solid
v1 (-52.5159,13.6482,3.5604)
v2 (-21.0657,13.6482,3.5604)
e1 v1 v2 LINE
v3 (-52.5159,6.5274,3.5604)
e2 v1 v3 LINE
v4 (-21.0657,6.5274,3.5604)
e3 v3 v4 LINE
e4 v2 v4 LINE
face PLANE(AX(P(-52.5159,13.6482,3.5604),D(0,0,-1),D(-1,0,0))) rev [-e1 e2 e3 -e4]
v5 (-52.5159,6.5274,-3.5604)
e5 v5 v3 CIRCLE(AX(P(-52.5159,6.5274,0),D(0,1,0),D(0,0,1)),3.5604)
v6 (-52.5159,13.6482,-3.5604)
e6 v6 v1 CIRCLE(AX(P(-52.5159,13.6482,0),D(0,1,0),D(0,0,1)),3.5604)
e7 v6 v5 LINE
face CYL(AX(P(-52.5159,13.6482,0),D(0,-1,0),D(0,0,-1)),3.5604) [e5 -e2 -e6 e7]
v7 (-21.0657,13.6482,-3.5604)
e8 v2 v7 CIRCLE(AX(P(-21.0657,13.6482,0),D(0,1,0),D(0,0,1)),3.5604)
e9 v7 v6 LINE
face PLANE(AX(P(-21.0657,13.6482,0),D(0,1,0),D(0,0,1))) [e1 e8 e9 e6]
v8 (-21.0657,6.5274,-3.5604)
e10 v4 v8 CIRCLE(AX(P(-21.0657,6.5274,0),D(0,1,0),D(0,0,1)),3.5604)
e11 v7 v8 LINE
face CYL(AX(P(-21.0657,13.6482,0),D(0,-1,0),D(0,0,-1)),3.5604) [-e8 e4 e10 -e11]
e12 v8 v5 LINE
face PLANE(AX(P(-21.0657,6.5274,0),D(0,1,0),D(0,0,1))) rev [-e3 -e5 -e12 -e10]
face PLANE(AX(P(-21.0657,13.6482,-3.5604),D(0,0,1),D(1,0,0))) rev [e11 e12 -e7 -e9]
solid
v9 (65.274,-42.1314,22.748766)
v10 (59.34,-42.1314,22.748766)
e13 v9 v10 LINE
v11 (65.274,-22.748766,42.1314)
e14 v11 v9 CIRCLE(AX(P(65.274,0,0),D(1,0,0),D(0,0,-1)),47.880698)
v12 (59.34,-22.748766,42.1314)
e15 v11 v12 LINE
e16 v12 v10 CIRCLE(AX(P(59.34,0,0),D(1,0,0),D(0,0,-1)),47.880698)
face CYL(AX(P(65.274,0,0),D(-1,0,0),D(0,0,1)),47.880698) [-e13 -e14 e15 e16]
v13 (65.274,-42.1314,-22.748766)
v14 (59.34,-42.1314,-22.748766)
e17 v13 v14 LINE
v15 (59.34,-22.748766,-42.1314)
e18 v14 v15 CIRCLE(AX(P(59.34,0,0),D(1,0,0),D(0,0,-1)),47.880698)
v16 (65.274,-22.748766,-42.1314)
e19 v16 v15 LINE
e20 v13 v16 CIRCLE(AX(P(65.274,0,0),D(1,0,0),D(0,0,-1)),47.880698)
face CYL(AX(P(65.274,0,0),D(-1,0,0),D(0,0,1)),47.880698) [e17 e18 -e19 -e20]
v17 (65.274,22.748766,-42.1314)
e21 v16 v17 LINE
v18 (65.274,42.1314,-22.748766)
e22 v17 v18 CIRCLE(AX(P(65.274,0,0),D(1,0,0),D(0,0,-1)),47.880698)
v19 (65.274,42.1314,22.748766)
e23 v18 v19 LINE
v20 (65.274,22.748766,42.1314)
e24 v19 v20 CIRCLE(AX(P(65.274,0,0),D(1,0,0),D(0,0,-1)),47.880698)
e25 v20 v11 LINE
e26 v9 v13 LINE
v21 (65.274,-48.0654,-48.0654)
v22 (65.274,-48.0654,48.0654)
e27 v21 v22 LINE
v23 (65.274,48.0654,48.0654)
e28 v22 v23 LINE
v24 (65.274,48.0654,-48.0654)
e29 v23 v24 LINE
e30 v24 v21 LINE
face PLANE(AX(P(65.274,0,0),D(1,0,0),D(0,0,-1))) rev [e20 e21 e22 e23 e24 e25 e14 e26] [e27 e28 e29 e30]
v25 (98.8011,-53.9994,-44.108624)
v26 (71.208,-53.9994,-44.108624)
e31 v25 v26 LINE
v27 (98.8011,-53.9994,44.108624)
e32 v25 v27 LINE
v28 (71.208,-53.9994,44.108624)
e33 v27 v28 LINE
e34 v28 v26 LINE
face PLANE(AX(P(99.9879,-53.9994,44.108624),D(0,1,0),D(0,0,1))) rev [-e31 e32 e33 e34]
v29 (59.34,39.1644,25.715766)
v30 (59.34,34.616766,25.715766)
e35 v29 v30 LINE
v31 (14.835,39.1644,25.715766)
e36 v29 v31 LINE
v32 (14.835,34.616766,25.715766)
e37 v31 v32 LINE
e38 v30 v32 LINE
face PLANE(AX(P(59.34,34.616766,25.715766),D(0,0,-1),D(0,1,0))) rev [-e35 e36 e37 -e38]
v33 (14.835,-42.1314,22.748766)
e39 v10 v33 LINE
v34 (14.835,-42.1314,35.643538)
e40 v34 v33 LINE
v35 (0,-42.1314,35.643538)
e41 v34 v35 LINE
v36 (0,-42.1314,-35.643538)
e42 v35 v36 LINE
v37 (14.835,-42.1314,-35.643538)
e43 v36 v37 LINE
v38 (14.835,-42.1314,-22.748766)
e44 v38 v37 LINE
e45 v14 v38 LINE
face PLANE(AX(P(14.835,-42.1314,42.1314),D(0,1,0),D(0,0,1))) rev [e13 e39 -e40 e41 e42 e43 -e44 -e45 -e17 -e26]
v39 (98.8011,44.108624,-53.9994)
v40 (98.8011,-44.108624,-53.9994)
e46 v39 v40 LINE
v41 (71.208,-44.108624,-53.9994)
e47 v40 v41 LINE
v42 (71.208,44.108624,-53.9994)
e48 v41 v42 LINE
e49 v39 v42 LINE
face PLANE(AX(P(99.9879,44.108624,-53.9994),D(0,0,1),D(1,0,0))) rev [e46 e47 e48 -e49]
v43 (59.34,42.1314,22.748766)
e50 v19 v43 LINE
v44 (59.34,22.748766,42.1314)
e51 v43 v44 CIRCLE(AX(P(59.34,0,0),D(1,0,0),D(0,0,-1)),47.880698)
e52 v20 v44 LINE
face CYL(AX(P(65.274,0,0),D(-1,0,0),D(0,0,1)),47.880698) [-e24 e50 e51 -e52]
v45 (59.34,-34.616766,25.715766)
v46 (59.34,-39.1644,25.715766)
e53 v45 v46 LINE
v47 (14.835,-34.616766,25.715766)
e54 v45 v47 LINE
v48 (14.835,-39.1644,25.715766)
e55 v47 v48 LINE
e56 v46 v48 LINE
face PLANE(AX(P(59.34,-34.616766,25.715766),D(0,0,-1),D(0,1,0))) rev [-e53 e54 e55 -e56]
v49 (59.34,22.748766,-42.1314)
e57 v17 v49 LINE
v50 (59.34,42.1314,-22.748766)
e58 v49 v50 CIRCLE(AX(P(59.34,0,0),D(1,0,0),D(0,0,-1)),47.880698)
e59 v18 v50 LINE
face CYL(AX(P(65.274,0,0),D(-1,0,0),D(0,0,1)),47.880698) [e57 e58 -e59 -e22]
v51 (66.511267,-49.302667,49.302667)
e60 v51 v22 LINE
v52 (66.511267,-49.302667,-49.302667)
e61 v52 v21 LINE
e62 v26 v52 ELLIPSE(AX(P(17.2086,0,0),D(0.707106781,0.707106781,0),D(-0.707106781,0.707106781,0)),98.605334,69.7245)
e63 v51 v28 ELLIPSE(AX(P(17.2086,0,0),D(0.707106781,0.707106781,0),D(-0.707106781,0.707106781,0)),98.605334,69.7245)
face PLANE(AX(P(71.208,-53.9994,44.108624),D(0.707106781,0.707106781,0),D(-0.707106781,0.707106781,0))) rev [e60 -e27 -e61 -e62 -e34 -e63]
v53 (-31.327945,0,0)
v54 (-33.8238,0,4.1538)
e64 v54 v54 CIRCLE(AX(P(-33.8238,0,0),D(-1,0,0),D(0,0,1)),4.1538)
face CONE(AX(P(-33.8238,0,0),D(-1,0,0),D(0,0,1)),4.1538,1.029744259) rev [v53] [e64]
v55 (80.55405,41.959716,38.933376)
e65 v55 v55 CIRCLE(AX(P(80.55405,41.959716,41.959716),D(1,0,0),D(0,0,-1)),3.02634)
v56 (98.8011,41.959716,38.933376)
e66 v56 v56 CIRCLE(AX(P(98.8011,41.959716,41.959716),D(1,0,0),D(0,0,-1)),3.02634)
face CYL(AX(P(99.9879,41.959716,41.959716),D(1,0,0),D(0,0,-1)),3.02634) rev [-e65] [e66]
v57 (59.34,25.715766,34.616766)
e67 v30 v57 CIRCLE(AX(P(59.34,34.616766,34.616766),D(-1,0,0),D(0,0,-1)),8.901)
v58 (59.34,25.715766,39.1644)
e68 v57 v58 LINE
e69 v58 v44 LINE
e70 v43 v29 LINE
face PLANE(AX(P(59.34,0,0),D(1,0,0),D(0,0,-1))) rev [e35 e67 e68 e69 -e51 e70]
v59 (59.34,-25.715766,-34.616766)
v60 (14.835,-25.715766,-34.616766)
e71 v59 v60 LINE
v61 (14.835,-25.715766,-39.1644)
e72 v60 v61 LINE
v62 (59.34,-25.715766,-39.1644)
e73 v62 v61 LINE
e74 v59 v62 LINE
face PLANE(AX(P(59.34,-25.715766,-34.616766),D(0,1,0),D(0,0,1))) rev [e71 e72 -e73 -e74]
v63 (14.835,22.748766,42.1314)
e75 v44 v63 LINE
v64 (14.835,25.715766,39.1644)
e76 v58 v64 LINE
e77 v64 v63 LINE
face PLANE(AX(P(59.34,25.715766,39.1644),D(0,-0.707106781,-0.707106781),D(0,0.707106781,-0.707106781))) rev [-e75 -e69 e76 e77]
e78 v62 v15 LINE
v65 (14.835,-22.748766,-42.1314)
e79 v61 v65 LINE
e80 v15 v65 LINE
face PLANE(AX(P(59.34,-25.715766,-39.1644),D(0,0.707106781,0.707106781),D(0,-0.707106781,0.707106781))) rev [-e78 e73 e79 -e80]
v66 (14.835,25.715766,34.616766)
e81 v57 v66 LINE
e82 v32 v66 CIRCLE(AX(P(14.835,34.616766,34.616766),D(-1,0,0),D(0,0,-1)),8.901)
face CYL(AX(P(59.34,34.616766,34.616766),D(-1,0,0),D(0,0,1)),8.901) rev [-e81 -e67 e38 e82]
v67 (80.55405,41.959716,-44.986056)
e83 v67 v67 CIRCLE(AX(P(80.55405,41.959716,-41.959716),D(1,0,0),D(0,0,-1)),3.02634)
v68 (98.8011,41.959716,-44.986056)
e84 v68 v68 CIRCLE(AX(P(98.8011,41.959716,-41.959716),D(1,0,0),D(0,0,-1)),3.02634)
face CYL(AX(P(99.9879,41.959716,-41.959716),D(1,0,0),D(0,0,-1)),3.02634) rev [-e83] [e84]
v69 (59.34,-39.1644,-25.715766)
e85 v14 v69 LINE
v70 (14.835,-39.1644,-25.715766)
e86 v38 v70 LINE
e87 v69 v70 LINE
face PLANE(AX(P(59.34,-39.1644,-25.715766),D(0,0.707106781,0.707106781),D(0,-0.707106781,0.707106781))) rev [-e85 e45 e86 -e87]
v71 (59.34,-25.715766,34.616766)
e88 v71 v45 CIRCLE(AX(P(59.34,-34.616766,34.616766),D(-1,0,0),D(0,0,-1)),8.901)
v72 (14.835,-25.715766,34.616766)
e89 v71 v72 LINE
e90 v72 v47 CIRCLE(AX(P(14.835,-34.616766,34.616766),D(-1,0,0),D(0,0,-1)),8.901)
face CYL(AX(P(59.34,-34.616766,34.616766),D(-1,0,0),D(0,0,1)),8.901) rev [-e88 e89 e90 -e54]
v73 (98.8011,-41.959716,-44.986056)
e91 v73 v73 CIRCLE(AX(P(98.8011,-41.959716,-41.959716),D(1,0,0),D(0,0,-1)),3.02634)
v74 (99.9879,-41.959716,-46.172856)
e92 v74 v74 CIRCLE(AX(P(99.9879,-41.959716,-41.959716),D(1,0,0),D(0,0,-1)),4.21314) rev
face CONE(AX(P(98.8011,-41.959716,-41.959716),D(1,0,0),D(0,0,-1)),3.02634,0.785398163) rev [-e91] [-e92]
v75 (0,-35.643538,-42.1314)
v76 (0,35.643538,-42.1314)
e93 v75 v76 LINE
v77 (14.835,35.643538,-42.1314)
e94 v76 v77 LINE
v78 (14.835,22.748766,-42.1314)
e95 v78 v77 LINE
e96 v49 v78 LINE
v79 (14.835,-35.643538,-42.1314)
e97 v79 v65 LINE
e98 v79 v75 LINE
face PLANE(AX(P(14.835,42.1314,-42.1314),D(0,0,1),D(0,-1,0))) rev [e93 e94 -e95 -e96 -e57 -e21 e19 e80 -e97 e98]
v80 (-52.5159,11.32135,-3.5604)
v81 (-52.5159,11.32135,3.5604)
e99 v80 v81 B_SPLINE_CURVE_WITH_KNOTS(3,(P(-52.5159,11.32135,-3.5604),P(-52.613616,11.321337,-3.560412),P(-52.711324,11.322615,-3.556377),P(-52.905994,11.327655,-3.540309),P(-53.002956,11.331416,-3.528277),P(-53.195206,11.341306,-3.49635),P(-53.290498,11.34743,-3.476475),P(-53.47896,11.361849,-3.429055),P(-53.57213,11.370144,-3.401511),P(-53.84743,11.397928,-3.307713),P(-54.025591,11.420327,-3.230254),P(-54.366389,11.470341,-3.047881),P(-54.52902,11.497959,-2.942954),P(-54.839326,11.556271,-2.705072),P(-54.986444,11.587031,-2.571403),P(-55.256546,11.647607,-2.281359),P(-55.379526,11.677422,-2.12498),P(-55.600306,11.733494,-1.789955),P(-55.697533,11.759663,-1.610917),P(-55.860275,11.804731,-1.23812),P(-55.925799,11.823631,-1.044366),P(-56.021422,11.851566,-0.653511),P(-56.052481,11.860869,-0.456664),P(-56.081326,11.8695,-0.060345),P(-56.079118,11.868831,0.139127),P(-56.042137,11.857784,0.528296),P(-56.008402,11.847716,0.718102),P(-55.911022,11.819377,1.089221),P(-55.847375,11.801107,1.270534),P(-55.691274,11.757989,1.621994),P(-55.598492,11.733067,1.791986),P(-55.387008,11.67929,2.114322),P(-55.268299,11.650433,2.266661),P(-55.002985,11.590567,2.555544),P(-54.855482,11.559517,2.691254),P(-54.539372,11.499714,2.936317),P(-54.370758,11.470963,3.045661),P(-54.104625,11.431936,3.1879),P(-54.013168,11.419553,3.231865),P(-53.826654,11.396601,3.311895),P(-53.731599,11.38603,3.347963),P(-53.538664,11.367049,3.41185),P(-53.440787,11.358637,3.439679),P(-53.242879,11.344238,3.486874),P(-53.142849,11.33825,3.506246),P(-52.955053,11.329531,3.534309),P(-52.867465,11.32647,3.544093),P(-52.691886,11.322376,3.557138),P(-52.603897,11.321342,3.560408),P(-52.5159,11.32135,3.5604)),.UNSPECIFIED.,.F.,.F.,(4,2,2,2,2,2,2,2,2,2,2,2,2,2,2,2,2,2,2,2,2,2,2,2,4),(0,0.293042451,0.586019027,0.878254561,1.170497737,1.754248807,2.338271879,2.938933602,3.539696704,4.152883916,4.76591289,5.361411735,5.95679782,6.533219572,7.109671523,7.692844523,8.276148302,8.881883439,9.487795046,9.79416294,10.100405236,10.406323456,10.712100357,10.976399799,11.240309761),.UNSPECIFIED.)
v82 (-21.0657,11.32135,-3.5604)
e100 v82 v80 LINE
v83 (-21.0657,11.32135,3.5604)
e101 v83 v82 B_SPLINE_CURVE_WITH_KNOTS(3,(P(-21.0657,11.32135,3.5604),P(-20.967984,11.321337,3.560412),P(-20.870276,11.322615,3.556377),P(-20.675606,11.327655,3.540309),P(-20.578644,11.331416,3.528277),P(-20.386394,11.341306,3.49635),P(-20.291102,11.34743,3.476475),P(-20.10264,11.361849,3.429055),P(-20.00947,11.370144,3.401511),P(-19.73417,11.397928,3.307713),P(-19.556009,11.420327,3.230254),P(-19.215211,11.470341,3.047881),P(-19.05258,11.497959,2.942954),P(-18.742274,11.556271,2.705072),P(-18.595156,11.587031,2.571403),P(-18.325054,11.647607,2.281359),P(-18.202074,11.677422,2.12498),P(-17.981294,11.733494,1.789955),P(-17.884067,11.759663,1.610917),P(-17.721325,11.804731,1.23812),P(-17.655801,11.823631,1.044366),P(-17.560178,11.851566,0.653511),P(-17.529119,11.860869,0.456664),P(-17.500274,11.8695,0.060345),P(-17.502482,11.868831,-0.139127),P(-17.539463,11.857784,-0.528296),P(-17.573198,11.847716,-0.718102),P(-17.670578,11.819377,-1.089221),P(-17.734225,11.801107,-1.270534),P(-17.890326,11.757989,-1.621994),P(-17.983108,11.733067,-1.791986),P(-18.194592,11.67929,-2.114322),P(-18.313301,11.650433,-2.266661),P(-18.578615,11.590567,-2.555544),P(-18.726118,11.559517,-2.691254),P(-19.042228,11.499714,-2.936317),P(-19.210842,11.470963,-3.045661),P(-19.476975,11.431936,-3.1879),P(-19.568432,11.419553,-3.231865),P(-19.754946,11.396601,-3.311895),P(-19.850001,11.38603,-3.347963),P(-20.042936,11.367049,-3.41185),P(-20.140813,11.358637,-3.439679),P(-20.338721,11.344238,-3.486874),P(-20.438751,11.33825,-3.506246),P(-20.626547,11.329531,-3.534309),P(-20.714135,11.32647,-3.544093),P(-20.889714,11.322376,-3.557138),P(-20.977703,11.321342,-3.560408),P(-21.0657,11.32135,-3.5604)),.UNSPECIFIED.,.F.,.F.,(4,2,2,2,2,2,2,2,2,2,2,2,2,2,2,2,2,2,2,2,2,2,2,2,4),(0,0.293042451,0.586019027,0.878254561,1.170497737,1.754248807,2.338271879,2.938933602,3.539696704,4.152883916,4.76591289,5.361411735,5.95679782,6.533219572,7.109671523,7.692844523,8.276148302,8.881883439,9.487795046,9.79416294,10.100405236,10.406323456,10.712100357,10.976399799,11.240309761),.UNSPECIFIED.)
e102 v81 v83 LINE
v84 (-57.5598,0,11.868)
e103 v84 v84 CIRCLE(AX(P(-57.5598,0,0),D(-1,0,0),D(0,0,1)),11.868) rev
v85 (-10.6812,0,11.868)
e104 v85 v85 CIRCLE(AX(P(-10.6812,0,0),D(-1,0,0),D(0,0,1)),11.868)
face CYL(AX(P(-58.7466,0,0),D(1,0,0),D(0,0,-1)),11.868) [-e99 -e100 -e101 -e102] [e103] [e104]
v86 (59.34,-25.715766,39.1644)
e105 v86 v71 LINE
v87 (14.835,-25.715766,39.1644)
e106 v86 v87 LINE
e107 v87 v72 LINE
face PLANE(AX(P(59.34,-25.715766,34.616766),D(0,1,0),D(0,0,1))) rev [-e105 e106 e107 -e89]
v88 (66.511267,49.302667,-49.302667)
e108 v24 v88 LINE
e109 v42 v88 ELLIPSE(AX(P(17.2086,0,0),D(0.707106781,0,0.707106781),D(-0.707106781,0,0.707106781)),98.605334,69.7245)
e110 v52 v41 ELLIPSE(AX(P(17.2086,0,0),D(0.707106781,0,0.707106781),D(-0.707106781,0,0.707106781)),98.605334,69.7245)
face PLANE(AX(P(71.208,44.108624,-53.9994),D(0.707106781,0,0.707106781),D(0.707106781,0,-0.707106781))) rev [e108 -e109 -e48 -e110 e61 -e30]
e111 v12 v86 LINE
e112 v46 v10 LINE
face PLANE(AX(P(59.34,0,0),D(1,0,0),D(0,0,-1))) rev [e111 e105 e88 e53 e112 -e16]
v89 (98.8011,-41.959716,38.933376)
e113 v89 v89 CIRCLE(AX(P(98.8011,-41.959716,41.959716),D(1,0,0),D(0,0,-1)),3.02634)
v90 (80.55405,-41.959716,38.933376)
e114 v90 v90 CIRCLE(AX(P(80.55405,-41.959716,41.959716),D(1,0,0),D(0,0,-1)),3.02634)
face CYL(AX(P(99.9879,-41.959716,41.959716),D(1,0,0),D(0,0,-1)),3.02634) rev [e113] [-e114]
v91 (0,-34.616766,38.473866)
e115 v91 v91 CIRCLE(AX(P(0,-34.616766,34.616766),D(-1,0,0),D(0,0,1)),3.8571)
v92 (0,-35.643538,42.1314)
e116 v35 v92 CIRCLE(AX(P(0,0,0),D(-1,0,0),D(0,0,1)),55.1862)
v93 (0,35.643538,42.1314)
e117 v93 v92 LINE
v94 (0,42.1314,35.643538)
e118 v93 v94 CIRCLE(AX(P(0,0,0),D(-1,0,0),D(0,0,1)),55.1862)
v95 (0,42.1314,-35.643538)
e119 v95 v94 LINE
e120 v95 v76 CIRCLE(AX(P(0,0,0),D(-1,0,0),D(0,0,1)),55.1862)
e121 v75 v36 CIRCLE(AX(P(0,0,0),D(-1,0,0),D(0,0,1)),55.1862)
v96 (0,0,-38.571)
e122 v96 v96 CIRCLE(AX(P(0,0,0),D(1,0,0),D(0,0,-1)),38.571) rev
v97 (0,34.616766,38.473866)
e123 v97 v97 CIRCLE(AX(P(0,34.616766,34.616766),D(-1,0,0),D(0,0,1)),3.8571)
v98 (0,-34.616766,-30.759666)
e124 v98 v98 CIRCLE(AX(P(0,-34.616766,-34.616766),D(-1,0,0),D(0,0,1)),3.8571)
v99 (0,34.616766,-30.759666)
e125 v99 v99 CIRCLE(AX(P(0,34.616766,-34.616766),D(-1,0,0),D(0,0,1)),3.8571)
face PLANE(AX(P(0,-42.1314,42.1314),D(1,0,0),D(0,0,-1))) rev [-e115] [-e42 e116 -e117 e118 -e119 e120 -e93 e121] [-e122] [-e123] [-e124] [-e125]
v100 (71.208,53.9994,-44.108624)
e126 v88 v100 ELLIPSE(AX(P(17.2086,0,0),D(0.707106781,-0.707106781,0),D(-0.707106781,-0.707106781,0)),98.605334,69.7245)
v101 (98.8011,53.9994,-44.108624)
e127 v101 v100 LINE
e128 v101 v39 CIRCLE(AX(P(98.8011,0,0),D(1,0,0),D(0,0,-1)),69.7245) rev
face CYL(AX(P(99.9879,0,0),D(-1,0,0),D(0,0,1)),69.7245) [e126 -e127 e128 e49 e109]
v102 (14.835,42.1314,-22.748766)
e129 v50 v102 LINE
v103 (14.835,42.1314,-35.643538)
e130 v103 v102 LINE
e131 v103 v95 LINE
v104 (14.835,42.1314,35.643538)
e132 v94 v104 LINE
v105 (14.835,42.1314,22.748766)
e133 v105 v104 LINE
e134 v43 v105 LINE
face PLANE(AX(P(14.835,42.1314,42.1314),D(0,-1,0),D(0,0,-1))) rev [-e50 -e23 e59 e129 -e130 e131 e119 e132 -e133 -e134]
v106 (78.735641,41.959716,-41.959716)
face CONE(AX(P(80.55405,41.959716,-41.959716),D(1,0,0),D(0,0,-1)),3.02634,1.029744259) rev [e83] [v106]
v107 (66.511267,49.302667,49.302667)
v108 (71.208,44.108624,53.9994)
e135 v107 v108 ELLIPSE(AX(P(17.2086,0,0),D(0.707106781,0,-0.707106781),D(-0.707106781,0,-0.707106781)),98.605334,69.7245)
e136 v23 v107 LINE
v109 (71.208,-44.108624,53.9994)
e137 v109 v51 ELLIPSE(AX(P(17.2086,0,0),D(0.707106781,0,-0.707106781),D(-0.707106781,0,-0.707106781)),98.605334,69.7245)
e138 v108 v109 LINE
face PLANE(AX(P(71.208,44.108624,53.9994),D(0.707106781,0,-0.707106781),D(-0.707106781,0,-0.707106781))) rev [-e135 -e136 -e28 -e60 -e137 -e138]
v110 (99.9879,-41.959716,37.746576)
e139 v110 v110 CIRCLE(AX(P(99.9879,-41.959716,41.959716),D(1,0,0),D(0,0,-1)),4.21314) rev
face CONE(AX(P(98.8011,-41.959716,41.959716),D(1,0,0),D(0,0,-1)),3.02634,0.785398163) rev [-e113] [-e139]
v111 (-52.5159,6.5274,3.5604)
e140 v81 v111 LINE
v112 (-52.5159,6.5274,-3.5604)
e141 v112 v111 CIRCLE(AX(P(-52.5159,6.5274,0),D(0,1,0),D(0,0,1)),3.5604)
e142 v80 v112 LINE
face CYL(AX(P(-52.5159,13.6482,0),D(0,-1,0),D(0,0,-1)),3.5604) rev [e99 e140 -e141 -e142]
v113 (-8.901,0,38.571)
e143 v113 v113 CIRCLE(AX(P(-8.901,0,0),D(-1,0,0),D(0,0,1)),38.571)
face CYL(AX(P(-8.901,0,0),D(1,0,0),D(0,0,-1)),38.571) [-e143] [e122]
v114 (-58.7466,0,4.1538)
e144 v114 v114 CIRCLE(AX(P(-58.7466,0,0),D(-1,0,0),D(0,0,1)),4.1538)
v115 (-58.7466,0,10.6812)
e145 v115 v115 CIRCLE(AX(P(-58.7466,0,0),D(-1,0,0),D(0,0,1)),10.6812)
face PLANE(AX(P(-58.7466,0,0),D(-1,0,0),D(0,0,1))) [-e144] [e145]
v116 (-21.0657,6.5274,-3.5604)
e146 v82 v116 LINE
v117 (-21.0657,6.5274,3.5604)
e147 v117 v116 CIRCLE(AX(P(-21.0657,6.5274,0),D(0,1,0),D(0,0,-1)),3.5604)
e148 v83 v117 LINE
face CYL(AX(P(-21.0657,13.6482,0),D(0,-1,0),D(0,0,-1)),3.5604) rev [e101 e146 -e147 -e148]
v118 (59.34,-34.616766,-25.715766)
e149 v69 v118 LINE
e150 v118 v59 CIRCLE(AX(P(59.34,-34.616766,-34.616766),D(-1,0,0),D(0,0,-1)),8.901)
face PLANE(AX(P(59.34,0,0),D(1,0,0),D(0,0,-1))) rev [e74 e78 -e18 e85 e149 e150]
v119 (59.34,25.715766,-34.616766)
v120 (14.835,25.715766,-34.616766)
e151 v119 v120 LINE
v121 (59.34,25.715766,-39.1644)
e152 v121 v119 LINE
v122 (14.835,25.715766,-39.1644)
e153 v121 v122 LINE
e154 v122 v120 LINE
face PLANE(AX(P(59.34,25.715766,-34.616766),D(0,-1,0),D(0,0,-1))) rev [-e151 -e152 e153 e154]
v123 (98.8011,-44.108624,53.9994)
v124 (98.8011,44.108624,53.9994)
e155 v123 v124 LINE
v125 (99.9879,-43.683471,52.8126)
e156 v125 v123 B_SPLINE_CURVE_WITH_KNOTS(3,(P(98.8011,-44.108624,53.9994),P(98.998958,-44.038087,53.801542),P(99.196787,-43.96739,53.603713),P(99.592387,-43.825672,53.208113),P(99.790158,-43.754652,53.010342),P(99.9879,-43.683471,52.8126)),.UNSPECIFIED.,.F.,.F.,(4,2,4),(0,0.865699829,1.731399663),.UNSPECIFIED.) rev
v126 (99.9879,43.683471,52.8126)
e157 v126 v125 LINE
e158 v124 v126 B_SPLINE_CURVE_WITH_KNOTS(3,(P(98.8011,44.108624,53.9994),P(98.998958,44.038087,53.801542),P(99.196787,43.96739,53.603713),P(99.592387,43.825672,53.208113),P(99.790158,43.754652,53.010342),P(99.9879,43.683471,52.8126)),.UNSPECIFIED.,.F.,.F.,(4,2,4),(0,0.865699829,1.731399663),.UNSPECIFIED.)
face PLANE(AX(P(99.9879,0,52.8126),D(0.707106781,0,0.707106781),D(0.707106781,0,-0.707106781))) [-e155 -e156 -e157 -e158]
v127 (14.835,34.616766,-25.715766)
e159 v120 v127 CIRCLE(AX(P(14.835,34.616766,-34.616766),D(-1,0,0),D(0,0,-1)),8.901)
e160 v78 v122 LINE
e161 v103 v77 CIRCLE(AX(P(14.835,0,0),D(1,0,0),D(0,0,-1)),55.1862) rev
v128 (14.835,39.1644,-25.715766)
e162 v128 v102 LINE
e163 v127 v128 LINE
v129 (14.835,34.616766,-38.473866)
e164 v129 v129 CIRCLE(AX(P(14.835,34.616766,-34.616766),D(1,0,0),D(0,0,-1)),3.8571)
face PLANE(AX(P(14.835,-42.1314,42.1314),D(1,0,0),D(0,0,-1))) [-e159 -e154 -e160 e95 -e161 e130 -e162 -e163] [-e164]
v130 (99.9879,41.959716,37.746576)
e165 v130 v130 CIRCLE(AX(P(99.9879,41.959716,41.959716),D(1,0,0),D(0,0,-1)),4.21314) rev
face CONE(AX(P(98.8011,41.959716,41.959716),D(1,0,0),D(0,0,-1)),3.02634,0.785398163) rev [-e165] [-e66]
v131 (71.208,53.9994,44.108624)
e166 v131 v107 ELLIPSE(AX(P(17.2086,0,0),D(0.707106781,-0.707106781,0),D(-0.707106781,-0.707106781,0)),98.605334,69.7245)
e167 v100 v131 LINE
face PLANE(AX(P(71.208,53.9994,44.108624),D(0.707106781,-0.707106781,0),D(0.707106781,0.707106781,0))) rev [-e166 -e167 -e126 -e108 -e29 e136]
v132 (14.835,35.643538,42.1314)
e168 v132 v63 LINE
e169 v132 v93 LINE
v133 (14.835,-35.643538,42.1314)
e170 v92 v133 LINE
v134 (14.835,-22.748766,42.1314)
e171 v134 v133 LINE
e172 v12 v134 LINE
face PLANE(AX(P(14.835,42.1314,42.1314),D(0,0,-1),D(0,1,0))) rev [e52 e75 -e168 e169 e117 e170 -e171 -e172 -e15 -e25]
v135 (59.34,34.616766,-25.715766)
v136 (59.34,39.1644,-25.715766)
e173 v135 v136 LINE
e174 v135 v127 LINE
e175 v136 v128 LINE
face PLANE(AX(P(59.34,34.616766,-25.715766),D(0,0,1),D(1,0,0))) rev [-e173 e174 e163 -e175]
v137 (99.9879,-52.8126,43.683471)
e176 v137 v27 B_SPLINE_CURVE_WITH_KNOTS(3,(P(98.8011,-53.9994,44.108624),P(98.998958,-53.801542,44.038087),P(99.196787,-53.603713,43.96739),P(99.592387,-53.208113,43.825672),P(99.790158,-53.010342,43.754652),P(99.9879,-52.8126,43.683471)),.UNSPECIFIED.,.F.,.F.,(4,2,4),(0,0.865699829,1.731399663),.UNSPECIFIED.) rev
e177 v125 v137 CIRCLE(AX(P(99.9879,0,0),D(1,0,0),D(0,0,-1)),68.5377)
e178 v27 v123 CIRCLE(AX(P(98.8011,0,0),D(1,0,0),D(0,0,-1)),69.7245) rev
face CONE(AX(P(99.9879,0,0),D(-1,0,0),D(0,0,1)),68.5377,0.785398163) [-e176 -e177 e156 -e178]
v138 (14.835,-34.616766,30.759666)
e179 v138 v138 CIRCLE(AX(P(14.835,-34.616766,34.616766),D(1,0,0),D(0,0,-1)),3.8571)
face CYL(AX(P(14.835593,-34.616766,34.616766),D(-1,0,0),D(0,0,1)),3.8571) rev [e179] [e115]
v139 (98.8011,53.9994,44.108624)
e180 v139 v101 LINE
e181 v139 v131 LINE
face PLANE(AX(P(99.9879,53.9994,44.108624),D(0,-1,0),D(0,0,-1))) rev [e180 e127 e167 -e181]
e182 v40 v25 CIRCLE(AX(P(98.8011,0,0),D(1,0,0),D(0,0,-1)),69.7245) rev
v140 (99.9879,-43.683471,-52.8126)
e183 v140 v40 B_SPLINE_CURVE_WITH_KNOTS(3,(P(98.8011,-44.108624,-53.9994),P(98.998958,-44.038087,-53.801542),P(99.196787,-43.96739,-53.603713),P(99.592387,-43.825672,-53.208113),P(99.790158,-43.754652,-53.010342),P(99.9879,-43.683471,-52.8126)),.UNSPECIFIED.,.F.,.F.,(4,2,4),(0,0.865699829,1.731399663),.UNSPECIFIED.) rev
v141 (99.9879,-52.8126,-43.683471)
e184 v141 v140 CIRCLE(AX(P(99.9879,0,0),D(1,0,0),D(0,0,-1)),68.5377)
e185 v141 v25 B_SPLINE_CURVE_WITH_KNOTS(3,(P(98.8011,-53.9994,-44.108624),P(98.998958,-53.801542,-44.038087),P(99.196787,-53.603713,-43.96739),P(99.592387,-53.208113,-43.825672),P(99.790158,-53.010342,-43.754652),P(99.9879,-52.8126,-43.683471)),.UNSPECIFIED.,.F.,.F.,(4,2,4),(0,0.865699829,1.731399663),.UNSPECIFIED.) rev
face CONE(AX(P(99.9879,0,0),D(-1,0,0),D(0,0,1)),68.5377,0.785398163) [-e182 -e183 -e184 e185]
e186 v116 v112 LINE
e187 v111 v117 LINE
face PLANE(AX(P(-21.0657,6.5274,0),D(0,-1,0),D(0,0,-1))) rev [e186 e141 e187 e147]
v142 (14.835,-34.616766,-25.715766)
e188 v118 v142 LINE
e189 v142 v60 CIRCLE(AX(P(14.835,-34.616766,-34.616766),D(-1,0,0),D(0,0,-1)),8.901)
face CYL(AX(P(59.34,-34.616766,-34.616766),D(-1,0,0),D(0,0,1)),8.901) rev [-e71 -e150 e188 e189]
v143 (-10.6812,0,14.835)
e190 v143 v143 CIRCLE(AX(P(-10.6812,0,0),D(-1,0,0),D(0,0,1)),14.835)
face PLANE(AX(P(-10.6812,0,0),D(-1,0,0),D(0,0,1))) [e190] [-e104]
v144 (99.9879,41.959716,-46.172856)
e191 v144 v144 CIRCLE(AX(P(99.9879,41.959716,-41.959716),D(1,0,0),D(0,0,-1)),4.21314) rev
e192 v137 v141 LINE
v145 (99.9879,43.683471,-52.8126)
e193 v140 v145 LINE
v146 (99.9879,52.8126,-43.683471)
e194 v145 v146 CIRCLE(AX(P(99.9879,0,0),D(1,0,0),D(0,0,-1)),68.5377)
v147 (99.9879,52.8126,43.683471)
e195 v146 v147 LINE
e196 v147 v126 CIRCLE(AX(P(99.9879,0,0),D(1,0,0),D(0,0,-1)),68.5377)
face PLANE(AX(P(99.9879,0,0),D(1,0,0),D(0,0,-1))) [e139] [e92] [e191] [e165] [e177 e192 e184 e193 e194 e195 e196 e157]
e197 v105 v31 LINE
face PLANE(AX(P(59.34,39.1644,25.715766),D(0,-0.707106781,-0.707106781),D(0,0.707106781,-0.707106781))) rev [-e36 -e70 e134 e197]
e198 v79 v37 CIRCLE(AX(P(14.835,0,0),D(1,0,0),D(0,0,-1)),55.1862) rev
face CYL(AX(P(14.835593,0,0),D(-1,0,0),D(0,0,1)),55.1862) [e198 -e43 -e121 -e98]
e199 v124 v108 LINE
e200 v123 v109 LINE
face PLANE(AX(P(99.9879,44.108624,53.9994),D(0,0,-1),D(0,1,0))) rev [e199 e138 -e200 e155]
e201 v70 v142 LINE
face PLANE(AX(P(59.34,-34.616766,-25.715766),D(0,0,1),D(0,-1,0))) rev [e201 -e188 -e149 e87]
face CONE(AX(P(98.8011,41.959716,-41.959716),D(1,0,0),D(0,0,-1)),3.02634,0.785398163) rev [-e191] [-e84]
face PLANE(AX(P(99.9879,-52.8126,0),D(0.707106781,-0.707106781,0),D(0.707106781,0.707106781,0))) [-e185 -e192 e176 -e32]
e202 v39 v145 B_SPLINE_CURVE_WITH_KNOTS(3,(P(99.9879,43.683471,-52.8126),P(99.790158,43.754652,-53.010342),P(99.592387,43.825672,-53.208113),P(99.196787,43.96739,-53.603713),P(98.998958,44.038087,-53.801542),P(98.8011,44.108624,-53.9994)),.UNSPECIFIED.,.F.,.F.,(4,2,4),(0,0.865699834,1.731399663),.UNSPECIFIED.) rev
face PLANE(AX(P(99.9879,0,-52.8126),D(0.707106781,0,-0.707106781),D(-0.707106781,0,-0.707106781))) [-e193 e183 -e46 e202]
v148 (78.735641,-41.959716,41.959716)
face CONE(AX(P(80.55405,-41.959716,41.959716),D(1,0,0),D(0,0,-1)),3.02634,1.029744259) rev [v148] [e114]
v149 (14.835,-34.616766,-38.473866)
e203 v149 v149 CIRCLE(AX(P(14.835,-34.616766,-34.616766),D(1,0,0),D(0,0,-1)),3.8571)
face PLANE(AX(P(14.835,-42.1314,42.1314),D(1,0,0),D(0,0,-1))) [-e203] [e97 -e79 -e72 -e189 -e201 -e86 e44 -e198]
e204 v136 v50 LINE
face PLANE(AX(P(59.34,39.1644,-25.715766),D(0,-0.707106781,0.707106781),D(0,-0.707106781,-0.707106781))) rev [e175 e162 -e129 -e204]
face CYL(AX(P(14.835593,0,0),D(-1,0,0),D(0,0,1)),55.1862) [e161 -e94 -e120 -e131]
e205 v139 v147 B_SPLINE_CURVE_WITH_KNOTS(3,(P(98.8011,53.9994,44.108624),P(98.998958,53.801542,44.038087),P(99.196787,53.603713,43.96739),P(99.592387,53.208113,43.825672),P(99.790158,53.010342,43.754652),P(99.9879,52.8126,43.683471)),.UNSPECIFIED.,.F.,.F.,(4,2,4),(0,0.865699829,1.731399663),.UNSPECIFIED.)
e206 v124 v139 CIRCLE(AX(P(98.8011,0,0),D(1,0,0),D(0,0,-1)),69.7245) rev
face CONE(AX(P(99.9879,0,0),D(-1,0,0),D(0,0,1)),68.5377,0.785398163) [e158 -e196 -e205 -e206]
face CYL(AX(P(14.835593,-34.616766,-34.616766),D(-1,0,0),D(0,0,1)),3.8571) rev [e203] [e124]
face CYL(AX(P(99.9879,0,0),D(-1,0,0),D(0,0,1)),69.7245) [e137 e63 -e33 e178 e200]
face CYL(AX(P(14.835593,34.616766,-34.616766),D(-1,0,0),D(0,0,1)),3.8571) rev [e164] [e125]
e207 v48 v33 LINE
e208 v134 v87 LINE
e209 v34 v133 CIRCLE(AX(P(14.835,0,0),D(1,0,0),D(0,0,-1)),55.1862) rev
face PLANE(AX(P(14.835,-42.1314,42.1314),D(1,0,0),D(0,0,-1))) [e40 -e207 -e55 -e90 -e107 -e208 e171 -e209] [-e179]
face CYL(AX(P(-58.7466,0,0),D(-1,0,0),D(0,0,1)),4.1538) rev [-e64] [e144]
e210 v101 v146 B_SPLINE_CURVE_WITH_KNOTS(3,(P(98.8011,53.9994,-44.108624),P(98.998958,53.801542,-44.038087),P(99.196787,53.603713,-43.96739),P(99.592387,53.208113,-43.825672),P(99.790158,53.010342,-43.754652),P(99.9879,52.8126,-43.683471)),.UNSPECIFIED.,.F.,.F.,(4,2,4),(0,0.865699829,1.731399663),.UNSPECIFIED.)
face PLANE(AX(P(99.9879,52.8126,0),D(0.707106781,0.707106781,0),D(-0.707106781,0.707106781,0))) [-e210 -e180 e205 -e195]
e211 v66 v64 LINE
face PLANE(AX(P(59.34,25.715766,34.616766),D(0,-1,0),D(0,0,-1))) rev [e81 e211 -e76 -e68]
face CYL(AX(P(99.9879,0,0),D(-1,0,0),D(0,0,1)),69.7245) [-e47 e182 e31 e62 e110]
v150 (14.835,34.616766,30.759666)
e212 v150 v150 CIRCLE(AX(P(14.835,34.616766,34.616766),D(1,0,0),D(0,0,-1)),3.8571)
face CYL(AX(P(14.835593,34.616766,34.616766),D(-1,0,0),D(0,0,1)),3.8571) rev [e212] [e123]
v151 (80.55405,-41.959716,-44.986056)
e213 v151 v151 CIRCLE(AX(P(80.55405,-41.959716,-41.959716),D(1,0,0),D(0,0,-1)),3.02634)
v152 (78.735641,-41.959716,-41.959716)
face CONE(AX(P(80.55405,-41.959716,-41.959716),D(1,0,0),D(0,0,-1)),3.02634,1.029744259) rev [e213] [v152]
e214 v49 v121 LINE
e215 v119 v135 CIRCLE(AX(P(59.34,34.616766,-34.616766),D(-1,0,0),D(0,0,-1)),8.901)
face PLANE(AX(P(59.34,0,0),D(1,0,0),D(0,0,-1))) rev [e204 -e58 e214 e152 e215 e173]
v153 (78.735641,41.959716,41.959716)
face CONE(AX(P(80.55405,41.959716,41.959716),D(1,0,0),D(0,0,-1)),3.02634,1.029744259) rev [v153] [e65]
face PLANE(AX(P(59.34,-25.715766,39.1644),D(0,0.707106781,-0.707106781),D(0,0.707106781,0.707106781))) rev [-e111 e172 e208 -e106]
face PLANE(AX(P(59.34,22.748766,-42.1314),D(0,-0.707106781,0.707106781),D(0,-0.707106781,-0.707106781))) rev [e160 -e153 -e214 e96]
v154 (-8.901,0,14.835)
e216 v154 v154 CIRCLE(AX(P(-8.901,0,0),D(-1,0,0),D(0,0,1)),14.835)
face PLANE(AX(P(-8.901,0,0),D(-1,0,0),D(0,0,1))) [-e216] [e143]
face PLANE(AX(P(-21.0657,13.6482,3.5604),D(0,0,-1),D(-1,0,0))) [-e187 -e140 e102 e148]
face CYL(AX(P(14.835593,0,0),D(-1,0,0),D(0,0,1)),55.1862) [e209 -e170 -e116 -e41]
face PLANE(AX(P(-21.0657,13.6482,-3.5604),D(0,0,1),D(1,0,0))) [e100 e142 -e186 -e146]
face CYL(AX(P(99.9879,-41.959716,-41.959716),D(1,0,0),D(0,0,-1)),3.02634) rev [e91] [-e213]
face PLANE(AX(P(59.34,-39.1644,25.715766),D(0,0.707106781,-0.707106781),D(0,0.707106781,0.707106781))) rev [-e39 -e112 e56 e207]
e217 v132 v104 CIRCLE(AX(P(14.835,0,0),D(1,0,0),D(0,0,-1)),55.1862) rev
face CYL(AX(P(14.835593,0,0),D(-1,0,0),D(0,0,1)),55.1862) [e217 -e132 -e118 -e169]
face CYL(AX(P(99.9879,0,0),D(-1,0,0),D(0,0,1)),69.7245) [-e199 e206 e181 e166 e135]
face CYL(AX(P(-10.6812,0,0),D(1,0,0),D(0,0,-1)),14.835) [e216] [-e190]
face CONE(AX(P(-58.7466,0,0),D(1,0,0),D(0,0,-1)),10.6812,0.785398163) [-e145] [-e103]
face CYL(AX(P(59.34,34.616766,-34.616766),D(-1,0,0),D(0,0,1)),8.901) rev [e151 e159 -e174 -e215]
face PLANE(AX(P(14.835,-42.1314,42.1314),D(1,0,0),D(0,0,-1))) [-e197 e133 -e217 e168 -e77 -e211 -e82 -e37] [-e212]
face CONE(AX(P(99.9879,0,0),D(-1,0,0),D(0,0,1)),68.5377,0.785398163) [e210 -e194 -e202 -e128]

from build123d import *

# Parameters (mm, degrees)
SKETCH_1_W                   = 142
SKETCH_1_H                   = 142
EXTRUDE_1_DEPTH              = 25
CUT_EXTRUDE_START            = -25
CUT_EXTRUDE_1_OUTLINE_R      = 6.5
CUT_EXTRUDE_1_DEPTH          = 25
SKETCH_9_R                   = 65
EXTRUDE_7_DEPTH              = 15
SKETCH_12_R                  = 25
EXTRUDE_10_DEPTH             = 3
SKETCH_10_R                  = 20
EXTRUDE_8_DEPTH              = 81
CHAMFER_4_SIZE               = 2
CUT_EXTRUDE_2_DEPTH          = 12
EXTRUDE_9_DEPTH              = 12
EXTRUDE_5_DEPTH              = 75
EXTRUDE_11_DEPTH             = 10
EXTRUDE_6_DEPTH              = 58.5
CHAMFER_6_SIZE               = 10
HOLE_WIZARD_M12_1_AT_2_COUNT = 2
HOLE_WIZARD_M12_1_AT_2_PITCH = 141.421356237
HOLE_WIZARD_M12_1_AT_3_COUNT = 2
HOLE_WIZARD_M12_1_AT_3_PITCH = 200
HOLE_WIZARD_M12_1_AT_4_COUNT = 2
HOLE_WIZARD_M12_1_AT_4_PITCH = 141.421356237
CHAMFER_5_SIZE               = 2
SCALE_1_SCALE                = 0.5934


# Read off the part's stored shape, not the designer's step: 除料-伸長1
with BuildPart() as part:
    # 草圖1 → 伸長1 (new body)
    with BuildSketch(Plane(origin=(0, 0, 0), x_dir=(0, 0, -1), z_dir=(1, 0, 0))):
        Rectangle(SKETCH_1_W, SKETCH_1_H)
    extrude(amount=EXTRUDE_1_DEPTH)

    # 除料-伸長1 outline → 除料-伸長1 (cut)
    with BuildSketch(Plane.ZY.offset(CUT_EXTRUDE_START)):
        with Locations((-58.336309448, -58.336309448)):
            Circle(CUT_EXTRUDE_1_OUTLINE_R)
        with Locations((58.336309448, -58.336309448)):
            Circle(CUT_EXTRUDE_1_OUTLINE_R)
        with Locations((58.336309448, 58.336309448)):
            Circle(CUT_EXTRUDE_1_OUTLINE_R)
        with Locations((-58.336309448, 58.336309448)):
            Circle(CUT_EXTRUDE_1_OUTLINE_R)
        with BuildLine():
            ThreePointArc((-71, 60.066629671), (-65.76093065, 65.76093065), (-60.066629671, 71))
            Line((-60.066629671, 71), (-71, 71))
            Line((-71, 71), (-71, 60.066629671))
        make_face()
        with BuildLine():
            Line((71, 71), (60.066629671, 71))
            ThreePointArc((60.066629671, 71), (65.76093065, 65.76093065), (71, 60.066629671))
            Line((71, 60.066629671), (71, 71))
        make_face()
        with BuildLine():
            ThreePointArc((-60.066629671, -71), (-65.76093065, -65.76093065), (-71, -60.066629671))
            Line((-71, -60.066629671), (-71, -71))
            Line((-71, -71), (-60.066629671, -71))
        make_face()
        with BuildLine():
            Line((71, -71), (71, -60.066629671))
            ThreePointArc((71, -60.066629671), (65.76093065, -65.76093065), (60.066629671, -71))
            Line((60.066629671, -71), (71, -71))
        make_face()
    extrude(amount=CUT_EXTRUDE_1_DEPTH, mode=Mode.SUBTRACT)

    # 草圖9 → 伸長7 (add)
    with BuildSketch(Plane.ZY):
        with Locations(Location((0, 0, 0), (0, 0, 180))):
            Circle(SKETCH_9_R)
    extrude(amount=EXTRUDE_7_DEPTH)

    # 草圖12 → 伸長10 (add)
    with BuildSketch(Plane.ZY.offset(15)):
        Circle(SKETCH_12_R)
    extrude(amount=EXTRUDE_10_DEPTH)

    # 草圖10 → 伸長8 (add)
    with BuildSketch(Plane.ZY.offset(18)):
        Circle(SKETCH_10_R)
    extrude(amount=EXTRUDE_8_DEPTH)

    # 導角4
    chamfer_4_edges = [part.edges().sort_by_distance(p)[0] for p in [
        (-99, 0, -20),
    ]]
    chamfer(chamfer_4_edges, length=CHAMFER_4_SIZE)

    # 草圖7 → 除料-伸長2 (cut)
    with BuildSketch(Plane(origin=(0, 11, 0), x_dir=(-1, 0, 0), z_dir=(0, 1, 0))):
        with BuildLine():
            Line((35.5, -6), (88.5, -6))
            ThreePointArc((88.5, -6), (94.5, 0), (88.5, 6))
            Line((88.5, 6), (35.5, 6))
            ThreePointArc((35.5, 6), (29.5, 0), (35.5, -6))
        make_face()
    extrude(amount=CUT_EXTRUDE_2_DEPTH, mode=Mode.SUBTRACT)

    # 草圖13 → M16 螺紋孔1 (revolve, cut)
    with BuildSketch(Plane(origin=(-99, 0, 0), x_dir=(0, 0, 1), z_dir=(0, 1, 0))):
        Polygon((0, 0), (0, 46.206024333), (7, 42), (7, 0), align=None)
    revolve(axis=Axis((-105.35, 0, 0), (1, 0, 0)), mode=Mode.SUBTRACT)

    # 草圖2 → 伸長5 (add)
    with BuildSketch(Plane(origin=(25, 0, 0), x_dir=(0, 0, -1), z_dir=(1, 0, 0))):
        with BuildLine():
            Line((-43.336309448, 58.336309448), (-43.336309448, 66))
            Line((-43.336309448, 66), (-38.336309448, 71))
            Line((-38.336309448, 71), (38.336309448, 71))
            Line((38.336309448, 71), (43.336309448, 66))
            Line((43.336309448, 66), (43.336309448, 58.336309448))
            ThreePointArc((43.336309448, 58.336309448), (47.72970773, 47.72970773), (58.336309448, 43.336309448))
            Line((58.336309448, 43.336309448), (66, 43.336309448))
            Line((66, 43.336309448), (71, 38.336309448))
            Line((71, 38.336309448), (71, -38.336309448))
            Line((71, -38.336309448), (66, -43.336309448))
            Line((66, -43.336309448), (58.336309448, -43.336309448))
            ThreePointArc((58.336309448, -43.336309448), (47.72970773, -47.72970773), (43.336309448, -58.336309448))
            Line((43.336309448, -58.336309448), (43.336309448, -66))
            Line((43.336309448, -66), (38.336309448, -71))
            Line((38.336309448, -71), (-38.336309448, -71))
            Line((-38.336309448, -71), (-43.336309448, -66))
            Line((-43.336309448, -66), (-43.336309448, -58.336309448))
            ThreePointArc((-43.336309448, -58.336309448), (-47.72970773, -47.72970773), (-58.336309448, -43.336309448))
            Line((-58.336309448, -43.336309448), (-66, -43.336309448))
            Line((-66, -43.336309448), (-71, -38.336309448))
            Line((-71, -38.336309448), (-71, 38.336309448))
            Line((-71, 38.336309448), (-66, 43.336309448))
            Line((-66, 43.336309448), (-58.336309448, 43.336309448))
            ThreePointArc((-58.336309448, 43.336309448), (-47.72970773, 47.72970773), (-43.336309448, 58.336309448))
        make_face()
    extrude(amount=EXTRUDE_5_DEPTH)

    # 草圖16 → 伸長11 (add)
    with BuildSketch(Plane(origin=(100, 0, 0), x_dir=(0, 0, -1), z_dir=(1, 0, 0))):
        with BuildLine():
            Line((-71, 38.336309448), (-71, -38.336309448))
            ThreePointArc((-71, -38.336309448), (-57.055554603, -57.055554603), (-38.336309448, -71))
            Line((-38.336309448, -71), (38.336309448, -71))
            ThreePointArc((38.336309448, -71), (57.055554603, -57.055554603), (71, -38.336309448))
            Line((71, -38.336309448), (71, 38.336309448))
            ThreePointArc((71, 38.336309448), (57.055554603, 57.055554603), (38.336309448, 71))
            Line((38.336309448, 71), (-38.336309448, 71))
            ThreePointArc((-38.336309448, 71), (-57.055554603, 57.055554603), (-71, 38.336309448))
        make_face()
    extrude(amount=EXTRUDE_11_DEPTH)

    # 草圖8 → 伸長6 (add)
    with BuildSketch(Plane(origin=(110, 0, 0), x_dir=(0, 0, -1), z_dir=(1, 0, 0))):
        with BuildLine():
            Line((-74.3320254, 91), (74.3320254, 91))
            ThreePointArc((74.3320254, 91), (83.085046789, 83.085046789), (91, 74.3320254))
            Line((91, 74.3320254), (91, -74.3320254))
            ThreePointArc((91, -74.3320254), (83.085046789, -83.085046789), (74.3320254, -91))
            Line((74.3320254, -91), (-74.3320254, -91))
            ThreePointArc((-74.3320254, -91), (-83.085046789, -83.085046789), (-91, -74.3320254))
            Line((-91, -74.3320254), (-91, 74.3320254))
            ThreePointArc((-91, 74.3320254), (-83.085046789, 83.085046789), (-74.3320254, 91))
        make_face()
    extrude(amount=EXTRUDE_6_DEPTH)

    # 導角6
    # the kernel refuses this chamfer: 10 mm, written as the material it takes off along each edge
    with BuildSketch(Plane(origin=(110, 100.048855279, -91), x_dir=(-0.027495876610586317, 0, 0.9996219169112968), z_dir=(0, -1, 0)), Plane(origin=(110, -91, -100.048855279), x_dir=(-0.027495876610586317, 0.9996219169112968, 0), z_dir=(0, 0, 1)), Plane(origin=(110, 91, 100.048855279), x_dir=(-0.027495876610586317, -0.9996219169112968, 0), z_dir=(0, 0, -1))) as chamfer_6_piece_1:
        Polygon((CHAMFER_6_SIZE * 0.999621916911, -CHAMFER_6_SIZE * 0.0274958766106), (-CHAMFER_6_SIZE * 0.0274958766106, -CHAMFER_6_SIZE * 0.999621916911), (0, 0), align=None)
    extrude(amount=200.097710558, mode=Mode.SUBTRACT)
    with BuildSketch(Plane(origin=(110, -100.048855279, 91), x_dir=(0.9996219169112968, 0, 0.027495876610586317), z_dir=(0, 1, 0))) as chamfer_6_piece_2:
        Polygon((CHAMFER_6_SIZE * 0.999621916911, CHAMFER_6_SIZE * 0.0274958766106), (-CHAMFER_6_SIZE * 0.0274958766106, CHAMFER_6_SIZE * 0.999621916911), (0, 0), align=None)
    extrude(amount=200.097710558, mode=Mode.SUBTRACT)

    # 草圖17 → M12 螺紋孔1 (revolve, cut)
    with BuildSketch(Plane(origin=(168.5, 70.710678119, 70.710678119), x_dir=(0, 0, -1), z_dir=(0, 1, 0))):
        Polygon((0, 0), (0, 35.814389157), (5.1, 32.75), (5.1, 0), align=None)
    hole_wizard_m12_1 = revolve(axis=Axis((174.85, 70.710678119, 70.710678119), (-1, 0, 0)), mode=Mode.SUBTRACT)

    # M12 螺紋孔1 at 2: M12 螺紋孔1 ×2
    with Locations(*[(0, -i * HOLE_WIZARD_M12_1_AT_2_PITCH, 0) for i in range(1, HOLE_WIZARD_M12_1_AT_2_COUNT)]):
        add(hole_wizard_m12_1, mode=Mode.SUBTRACT)

    # M12 螺紋孔1 at 3: M12 螺紋孔1 ×2
    with Locations(*[Vector(0, -0.7071067811865476, -0.7071067811865476) * (i * HOLE_WIZARD_M12_1_AT_3_PITCH) for i in range(1, HOLE_WIZARD_M12_1_AT_3_COUNT)]):
        add(hole_wizard_m12_1, mode=Mode.SUBTRACT)

    # M12 螺紋孔1 at 4: M12 螺紋孔1 ×2
    with Locations(*[(0, 0, -i * HOLE_WIZARD_M12_1_AT_4_PITCH) for i in range(1, HOLE_WIZARD_M12_1_AT_4_COUNT)]):
        add(hole_wizard_m12_1, mode=Mode.SUBTRACT)

    # 導角5
    chamfer_5_edges = [part.edges().sort_by_distance(p)[0] for p in [
        (168.5, 83.085046789, -83.085046789),
        (168.5, 91, 0),
        (168.5, 83.085046789, 83.085046789),
        (168.5, 0, 91),
        (168.5, -83.085046789, 83.085046789),
        (168.5, -91, 0),
        (168.5, -83.085046789, -83.085046789),
        (168.5, 0, -91),
        (168.5, 70.710678119, -65.610678119),
        (168.5, -70.710678119, -65.610678119),
        (168.5, -70.710678119, 75.810678119),
        (168.5, 70.710678119, 75.810678119),
    ]]
    chamfer(chamfer_5_edges, length=CHAMFER_5_SIZE)


with BuildPart() as body_2:
    # 草圖11 → 伸長9 (new body)
    with BuildSketch(Plane(origin=(0, 11, 0), x_dir=(1, 0, 0), z_dir=(0, 1, 0))):
        with BuildLine():
            Line((-35.5, 6), (-88.5, 6))
            ThreePointArc((-88.5, 6), (-94.5, 0), (-88.5, -6))
            Line((-88.5, -6), (-35.5, -6))
            ThreePointArc((-35.5, -6), (-29.5, 0), (-35.5, 6))
        make_face()
    extrude(amount=EXTRUDE_9_DEPTH)


with BuildPart() as body_2_1:
    # 缩放比例1: scaled about (0, 0, 0)
    add(body_2.part.scale(SCALE_1_SCALE))


with BuildPart() as part_1:
    # 缩放比例1: scaled about (0, 0, 0)
    add(part.part.scale(SCALE_1_SCALE))


solid = Compound([body_2_1.part, part_1.part])
